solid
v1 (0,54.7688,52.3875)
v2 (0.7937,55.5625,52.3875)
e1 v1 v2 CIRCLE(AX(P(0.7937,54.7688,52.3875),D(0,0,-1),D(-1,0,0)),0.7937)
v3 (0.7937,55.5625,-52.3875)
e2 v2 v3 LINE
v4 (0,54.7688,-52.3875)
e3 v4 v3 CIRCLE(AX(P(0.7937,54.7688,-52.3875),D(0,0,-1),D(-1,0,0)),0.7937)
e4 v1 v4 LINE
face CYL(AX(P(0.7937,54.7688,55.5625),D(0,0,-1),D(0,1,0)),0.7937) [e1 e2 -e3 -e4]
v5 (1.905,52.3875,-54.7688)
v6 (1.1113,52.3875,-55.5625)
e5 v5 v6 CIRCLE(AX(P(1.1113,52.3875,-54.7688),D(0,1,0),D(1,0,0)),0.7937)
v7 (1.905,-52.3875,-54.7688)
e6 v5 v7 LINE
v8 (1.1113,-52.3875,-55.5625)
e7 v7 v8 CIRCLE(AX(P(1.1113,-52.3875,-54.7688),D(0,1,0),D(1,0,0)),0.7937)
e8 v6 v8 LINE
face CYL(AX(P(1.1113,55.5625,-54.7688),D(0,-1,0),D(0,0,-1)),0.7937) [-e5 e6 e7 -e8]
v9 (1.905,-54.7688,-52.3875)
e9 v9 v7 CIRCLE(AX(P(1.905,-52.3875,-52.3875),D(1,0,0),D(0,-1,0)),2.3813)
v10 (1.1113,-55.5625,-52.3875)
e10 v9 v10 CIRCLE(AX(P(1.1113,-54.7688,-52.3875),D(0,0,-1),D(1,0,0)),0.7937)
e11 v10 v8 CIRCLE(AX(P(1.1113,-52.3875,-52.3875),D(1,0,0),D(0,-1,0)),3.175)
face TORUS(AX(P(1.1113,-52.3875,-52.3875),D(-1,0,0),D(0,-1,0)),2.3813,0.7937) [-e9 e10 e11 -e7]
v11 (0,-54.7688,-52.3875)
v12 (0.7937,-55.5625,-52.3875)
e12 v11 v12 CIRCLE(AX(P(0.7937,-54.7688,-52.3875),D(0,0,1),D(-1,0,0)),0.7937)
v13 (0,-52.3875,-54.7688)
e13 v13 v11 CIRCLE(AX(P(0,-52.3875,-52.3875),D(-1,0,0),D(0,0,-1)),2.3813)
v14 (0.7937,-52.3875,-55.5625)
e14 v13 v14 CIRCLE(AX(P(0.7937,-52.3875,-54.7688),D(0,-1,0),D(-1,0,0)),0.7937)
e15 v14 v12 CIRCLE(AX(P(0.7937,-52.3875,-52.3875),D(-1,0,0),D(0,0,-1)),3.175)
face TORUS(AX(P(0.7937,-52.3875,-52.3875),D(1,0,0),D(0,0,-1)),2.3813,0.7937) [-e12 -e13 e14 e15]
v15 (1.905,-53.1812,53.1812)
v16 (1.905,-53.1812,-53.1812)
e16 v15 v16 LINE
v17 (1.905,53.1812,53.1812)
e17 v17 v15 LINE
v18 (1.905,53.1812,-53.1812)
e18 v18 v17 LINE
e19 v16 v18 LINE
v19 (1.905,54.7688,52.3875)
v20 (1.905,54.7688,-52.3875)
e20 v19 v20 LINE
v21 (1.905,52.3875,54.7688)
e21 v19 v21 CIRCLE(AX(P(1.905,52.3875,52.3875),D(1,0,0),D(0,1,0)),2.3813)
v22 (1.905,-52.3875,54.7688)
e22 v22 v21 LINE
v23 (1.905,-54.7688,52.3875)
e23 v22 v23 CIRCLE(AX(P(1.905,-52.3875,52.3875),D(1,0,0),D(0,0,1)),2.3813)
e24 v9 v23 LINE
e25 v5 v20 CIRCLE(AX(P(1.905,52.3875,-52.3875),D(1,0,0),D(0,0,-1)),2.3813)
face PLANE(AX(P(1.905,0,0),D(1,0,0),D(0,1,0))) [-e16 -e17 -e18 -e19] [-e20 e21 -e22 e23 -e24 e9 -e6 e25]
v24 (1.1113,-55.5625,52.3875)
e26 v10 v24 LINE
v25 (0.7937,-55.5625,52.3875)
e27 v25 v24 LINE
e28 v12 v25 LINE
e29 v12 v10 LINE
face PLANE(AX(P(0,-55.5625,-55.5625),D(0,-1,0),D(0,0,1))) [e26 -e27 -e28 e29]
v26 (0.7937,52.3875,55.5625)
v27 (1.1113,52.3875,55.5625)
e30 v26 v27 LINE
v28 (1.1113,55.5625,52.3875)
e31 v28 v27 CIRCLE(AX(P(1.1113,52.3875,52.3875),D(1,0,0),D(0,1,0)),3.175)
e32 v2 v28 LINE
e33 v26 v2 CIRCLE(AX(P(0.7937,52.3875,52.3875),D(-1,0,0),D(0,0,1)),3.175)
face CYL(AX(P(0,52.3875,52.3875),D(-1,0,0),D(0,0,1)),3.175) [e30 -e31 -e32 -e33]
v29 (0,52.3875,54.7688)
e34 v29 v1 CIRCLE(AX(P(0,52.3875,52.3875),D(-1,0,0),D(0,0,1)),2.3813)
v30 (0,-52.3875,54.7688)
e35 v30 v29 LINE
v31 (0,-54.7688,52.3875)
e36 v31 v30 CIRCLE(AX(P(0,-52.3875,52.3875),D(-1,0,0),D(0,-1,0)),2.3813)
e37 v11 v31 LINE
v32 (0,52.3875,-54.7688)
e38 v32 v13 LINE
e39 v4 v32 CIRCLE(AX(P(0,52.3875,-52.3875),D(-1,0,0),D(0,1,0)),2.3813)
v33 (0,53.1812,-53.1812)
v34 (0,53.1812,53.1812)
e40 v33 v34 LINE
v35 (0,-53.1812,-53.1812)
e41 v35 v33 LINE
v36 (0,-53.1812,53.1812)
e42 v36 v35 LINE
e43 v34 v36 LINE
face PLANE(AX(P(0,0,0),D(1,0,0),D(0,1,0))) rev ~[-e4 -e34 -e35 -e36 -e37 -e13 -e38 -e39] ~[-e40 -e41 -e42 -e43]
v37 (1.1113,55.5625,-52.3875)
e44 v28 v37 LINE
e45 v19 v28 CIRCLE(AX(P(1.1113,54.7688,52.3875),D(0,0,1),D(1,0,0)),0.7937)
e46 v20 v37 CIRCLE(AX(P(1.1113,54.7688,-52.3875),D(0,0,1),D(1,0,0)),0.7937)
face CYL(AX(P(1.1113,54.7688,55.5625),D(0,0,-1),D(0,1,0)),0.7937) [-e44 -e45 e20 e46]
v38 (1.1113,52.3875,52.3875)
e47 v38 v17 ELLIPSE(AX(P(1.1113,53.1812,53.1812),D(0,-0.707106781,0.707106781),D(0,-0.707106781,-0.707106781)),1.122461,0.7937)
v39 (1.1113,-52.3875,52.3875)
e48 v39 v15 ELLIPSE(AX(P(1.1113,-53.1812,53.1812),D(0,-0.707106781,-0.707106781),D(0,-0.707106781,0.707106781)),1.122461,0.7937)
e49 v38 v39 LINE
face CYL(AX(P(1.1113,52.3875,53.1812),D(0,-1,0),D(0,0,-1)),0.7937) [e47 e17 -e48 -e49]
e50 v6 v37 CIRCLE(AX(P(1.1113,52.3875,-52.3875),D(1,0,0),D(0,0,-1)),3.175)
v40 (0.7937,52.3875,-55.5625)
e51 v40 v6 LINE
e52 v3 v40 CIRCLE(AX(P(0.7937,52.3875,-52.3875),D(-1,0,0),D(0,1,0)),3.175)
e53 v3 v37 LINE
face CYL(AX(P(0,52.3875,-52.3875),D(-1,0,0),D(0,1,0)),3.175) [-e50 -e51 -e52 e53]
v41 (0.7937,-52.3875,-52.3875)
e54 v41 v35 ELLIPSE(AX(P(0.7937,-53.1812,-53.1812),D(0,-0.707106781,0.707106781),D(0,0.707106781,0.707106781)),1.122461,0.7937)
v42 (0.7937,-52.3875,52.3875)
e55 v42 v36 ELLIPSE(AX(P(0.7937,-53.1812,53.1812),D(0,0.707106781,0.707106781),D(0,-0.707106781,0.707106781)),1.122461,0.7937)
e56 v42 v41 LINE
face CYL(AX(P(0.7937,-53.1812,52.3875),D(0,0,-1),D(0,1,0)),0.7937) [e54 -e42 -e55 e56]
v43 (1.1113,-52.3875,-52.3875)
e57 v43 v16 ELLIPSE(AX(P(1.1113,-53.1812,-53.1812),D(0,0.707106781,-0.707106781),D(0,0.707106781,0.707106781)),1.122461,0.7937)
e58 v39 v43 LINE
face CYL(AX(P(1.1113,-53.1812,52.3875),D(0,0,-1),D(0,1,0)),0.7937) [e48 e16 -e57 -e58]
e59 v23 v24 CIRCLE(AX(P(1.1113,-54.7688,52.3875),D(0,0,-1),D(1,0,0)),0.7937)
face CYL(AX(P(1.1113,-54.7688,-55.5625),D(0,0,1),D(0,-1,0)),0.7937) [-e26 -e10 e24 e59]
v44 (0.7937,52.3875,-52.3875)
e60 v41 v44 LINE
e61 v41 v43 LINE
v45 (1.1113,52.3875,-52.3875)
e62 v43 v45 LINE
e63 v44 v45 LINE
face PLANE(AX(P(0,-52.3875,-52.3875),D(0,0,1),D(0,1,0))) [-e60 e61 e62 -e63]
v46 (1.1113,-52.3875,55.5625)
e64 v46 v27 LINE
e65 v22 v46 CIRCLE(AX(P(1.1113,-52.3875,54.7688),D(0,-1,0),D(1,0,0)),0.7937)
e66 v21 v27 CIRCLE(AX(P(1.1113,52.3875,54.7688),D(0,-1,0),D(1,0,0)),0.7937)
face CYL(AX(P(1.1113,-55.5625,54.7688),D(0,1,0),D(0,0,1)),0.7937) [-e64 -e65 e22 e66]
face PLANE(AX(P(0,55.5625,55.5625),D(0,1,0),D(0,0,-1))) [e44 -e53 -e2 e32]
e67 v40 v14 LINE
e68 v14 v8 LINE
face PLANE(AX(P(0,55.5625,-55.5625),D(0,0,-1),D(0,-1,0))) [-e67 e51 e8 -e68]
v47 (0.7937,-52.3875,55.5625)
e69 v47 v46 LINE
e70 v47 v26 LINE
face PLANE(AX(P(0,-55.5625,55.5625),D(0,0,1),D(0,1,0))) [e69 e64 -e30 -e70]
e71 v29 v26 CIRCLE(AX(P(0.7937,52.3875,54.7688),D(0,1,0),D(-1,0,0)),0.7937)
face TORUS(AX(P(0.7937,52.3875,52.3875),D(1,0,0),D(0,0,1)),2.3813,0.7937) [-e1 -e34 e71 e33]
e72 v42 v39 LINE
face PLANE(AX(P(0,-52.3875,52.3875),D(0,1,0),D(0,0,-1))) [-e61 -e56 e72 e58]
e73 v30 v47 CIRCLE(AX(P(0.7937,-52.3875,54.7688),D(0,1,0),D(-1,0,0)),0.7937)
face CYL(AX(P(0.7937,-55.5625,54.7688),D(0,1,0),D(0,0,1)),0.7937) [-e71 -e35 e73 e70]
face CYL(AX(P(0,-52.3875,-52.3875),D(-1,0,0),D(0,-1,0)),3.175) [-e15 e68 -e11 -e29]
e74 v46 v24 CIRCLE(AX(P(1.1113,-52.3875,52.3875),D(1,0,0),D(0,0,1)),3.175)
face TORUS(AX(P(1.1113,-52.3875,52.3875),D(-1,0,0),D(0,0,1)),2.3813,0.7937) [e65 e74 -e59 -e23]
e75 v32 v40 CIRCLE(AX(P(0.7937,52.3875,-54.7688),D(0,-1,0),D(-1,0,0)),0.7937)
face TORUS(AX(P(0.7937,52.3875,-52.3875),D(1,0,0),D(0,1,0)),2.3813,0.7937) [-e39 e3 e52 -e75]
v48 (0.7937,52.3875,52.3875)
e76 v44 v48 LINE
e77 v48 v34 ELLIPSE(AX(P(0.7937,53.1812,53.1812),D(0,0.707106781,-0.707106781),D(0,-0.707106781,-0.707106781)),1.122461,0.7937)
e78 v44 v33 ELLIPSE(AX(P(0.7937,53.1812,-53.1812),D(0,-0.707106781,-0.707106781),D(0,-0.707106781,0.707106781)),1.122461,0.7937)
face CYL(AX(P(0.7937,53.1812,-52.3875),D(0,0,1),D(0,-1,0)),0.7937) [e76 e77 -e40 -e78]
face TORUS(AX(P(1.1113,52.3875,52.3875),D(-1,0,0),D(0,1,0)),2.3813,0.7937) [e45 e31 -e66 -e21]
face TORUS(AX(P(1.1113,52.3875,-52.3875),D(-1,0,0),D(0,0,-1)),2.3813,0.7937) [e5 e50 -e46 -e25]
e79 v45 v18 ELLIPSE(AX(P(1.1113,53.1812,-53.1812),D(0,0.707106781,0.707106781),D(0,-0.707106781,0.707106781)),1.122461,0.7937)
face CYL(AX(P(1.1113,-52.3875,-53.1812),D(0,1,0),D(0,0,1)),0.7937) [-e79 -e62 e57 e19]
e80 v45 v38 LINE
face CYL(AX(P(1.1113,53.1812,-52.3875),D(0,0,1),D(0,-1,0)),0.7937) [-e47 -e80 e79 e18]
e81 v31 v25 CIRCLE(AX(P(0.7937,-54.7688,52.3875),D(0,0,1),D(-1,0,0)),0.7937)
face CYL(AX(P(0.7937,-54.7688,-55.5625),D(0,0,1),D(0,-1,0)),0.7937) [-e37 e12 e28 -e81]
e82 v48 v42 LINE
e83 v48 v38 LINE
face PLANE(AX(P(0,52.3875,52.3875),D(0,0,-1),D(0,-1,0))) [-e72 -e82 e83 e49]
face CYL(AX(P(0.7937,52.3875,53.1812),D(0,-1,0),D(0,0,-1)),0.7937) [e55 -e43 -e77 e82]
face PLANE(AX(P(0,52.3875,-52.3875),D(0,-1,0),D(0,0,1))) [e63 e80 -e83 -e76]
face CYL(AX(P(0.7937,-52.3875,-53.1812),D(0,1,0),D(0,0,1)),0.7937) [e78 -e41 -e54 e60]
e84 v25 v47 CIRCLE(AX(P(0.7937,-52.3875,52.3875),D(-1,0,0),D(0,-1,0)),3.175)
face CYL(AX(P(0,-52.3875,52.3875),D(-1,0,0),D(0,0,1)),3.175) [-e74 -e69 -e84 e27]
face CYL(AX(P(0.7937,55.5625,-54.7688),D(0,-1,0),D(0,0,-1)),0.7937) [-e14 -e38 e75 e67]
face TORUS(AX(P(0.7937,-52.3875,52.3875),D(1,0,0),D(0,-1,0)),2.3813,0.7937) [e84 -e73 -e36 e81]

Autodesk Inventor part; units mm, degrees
ref_plane "YZ Plane" through (0, 0, 0) normal (1, 0, 0) x (0, 1, 0)
ref_plane "XZ Plane" through (0, 0, 0) normal (0, 1, 0) x (-1, 0, 0)
ref_plane "XY Plane" through (0, 0, 0) normal (0, 0, 1) x (1, 0, 0)
sketch "Sketch1" plane through (0, 0, 0) normal (1, 0, 0) x (0, 1, 0)
  line L0 (-52.3875, -52.3875) -> (52.3875, -52.3875)
  line L1 (52.3875, -52.3875) -> (52.3875, 52.3875)
  line L2 (52.3875, 52.3875) -> (-52.3875, 52.3875)
  line L3 (-52.3875, 52.3875) -> (-52.3875, -52.3875)
  line L4 (-52.3875, -52.3875) -> (52.3875, 52.3875) construction
  line L5 (52.3875, -52.3875) -> (-52.3875, 52.3875) construction
  line L6 (-55.5625, 55.5625) -> (55.5625, 55.5625)
  line L7 (55.5625, 55.5625) -> (55.5625, -55.5625)
  line L8 (55.5625, -55.5625) -> (-55.5625, -55.5625)
  line L9 (-55.5625, -55.5625) -> (-55.5625, 55.5625)
  point P0 (0, 0)
  dimension "d0" = 104.775
  dimension "d1" = 104.775
  dimension "d2" = 3.175
extrude "Extrusion1" add sketch "Sketch1" along normal blind 1.905
fillet "Fillet1" radius 0.7937 16 edges at (1.905, 0, 55.5625) (0, 0, 55.5625) (1.905, 0, 52.3875) (0, 0, 52.3875) (1.905, 52.3875, 0) (1.905, 55.5625, 0) (0, 52.3875, 0) (0, 55.5625, 0) (1.905, 0, -55.5625) (1.905, 0, -52.3875) (0, 0, -55.5625) (0, 0, -52.3875) (0, -52.3875, 0) (1.905, -52.3875, 0) (0, -55.5625, 0) (1.905, -55.5625, 0)
fillet "Fillet2" radius 3.175 12 edges at (0.9525, 55.5625, 55.5625) (0.2325, 55.33, 55.33) (1.6725, 55.33, 55.33) (0.9525, -55.5625, 55.5625) (0.2325, -55.33, 55.33) (1.6725, -55.33, 55.33) (1.6725, -55.33, -55.33) (0.2325, -55.33, -55.33) (0.9525, -55.5625, -55.5625) (0.9525, 55.5625, -55.5625) (0.2325, 55.33, -55.33) (1.6725, 55.33, -55.33)
equation "\"d0\" = 0.25 * frontBackORingID"
equation "\"d1\" = 0.25 * frontBackORingID"
equation "\"d2\" = oRingWidth"
equation "\"d5\" = 0.25 * oRingWidth"
equation "\"d6\" = oRingWidth"
equation "\"acrylicThickness\" = 6.35"
equation "\"height\" = 101.6"
equation "\"width\" = 101.6"
equation "\"depth\" = 101.6"
equation "\"mirrorAngle\" = 5deg"
equation "\"detectorWidth\" = 52"
equation "\"detectorHeight\" = 52"
equation "\"mirrorThickness\" = 3"
equation "\"fresnelThickness\" = 0.1"
equation "\"focalLength\" = 76.2"
equation "\"ior\" = 1.49"
equation "\"centerThickness\" = 1.524"
equation "\"fresnelAngle\" = 90deg"
equation "\"fresnelEffectiveDiameter\" = 76.2"
equation "\"mirrorSuppourtWidth\" = 38.1"
equation "\"backGrooveBit\" = 4.8006"
equation "\"sensorHolderWidth\" = 88.9"
equation "\"sensorHolderHeight\" = 88.9"
equation "\"sensorHolderSensorHeight\" = 53.975"
equation "\"sensorHolderSensorWidth\" = 53.975"
equation "\"oRingWidth\" = 3.175"
equation "\"sensorHolderORingID\" = 203.2"
equation "\"sensorHolderFlushORingID\" = 304.8"
equation "\"frontBackORingID\" = 419.1"
equation "\"topBottomHorizontalMirrorGroove\" = 12.7"
equation "\"backMirrorGroove\" = 6.35"
equation "\"mirrorGroove\" = 19.05"
equation "\"fresnelChamfer\" = 6.35"
equation "\"mirrorGrooveFillet\" = 6.35"
equation "\"mirrorGrooveDrill\" = 6.35"
equation "\"mirrorGrooveMill\" = 3.175"
equation "\"fresnelMirrorChamfer\" = 6.35"
equation "\"detectorOpeningHeight\" = 76.2"
equation "\"detectorOpeningWidth\" = 76.2"
properties part number "frontBackORing" material "Rubber"
